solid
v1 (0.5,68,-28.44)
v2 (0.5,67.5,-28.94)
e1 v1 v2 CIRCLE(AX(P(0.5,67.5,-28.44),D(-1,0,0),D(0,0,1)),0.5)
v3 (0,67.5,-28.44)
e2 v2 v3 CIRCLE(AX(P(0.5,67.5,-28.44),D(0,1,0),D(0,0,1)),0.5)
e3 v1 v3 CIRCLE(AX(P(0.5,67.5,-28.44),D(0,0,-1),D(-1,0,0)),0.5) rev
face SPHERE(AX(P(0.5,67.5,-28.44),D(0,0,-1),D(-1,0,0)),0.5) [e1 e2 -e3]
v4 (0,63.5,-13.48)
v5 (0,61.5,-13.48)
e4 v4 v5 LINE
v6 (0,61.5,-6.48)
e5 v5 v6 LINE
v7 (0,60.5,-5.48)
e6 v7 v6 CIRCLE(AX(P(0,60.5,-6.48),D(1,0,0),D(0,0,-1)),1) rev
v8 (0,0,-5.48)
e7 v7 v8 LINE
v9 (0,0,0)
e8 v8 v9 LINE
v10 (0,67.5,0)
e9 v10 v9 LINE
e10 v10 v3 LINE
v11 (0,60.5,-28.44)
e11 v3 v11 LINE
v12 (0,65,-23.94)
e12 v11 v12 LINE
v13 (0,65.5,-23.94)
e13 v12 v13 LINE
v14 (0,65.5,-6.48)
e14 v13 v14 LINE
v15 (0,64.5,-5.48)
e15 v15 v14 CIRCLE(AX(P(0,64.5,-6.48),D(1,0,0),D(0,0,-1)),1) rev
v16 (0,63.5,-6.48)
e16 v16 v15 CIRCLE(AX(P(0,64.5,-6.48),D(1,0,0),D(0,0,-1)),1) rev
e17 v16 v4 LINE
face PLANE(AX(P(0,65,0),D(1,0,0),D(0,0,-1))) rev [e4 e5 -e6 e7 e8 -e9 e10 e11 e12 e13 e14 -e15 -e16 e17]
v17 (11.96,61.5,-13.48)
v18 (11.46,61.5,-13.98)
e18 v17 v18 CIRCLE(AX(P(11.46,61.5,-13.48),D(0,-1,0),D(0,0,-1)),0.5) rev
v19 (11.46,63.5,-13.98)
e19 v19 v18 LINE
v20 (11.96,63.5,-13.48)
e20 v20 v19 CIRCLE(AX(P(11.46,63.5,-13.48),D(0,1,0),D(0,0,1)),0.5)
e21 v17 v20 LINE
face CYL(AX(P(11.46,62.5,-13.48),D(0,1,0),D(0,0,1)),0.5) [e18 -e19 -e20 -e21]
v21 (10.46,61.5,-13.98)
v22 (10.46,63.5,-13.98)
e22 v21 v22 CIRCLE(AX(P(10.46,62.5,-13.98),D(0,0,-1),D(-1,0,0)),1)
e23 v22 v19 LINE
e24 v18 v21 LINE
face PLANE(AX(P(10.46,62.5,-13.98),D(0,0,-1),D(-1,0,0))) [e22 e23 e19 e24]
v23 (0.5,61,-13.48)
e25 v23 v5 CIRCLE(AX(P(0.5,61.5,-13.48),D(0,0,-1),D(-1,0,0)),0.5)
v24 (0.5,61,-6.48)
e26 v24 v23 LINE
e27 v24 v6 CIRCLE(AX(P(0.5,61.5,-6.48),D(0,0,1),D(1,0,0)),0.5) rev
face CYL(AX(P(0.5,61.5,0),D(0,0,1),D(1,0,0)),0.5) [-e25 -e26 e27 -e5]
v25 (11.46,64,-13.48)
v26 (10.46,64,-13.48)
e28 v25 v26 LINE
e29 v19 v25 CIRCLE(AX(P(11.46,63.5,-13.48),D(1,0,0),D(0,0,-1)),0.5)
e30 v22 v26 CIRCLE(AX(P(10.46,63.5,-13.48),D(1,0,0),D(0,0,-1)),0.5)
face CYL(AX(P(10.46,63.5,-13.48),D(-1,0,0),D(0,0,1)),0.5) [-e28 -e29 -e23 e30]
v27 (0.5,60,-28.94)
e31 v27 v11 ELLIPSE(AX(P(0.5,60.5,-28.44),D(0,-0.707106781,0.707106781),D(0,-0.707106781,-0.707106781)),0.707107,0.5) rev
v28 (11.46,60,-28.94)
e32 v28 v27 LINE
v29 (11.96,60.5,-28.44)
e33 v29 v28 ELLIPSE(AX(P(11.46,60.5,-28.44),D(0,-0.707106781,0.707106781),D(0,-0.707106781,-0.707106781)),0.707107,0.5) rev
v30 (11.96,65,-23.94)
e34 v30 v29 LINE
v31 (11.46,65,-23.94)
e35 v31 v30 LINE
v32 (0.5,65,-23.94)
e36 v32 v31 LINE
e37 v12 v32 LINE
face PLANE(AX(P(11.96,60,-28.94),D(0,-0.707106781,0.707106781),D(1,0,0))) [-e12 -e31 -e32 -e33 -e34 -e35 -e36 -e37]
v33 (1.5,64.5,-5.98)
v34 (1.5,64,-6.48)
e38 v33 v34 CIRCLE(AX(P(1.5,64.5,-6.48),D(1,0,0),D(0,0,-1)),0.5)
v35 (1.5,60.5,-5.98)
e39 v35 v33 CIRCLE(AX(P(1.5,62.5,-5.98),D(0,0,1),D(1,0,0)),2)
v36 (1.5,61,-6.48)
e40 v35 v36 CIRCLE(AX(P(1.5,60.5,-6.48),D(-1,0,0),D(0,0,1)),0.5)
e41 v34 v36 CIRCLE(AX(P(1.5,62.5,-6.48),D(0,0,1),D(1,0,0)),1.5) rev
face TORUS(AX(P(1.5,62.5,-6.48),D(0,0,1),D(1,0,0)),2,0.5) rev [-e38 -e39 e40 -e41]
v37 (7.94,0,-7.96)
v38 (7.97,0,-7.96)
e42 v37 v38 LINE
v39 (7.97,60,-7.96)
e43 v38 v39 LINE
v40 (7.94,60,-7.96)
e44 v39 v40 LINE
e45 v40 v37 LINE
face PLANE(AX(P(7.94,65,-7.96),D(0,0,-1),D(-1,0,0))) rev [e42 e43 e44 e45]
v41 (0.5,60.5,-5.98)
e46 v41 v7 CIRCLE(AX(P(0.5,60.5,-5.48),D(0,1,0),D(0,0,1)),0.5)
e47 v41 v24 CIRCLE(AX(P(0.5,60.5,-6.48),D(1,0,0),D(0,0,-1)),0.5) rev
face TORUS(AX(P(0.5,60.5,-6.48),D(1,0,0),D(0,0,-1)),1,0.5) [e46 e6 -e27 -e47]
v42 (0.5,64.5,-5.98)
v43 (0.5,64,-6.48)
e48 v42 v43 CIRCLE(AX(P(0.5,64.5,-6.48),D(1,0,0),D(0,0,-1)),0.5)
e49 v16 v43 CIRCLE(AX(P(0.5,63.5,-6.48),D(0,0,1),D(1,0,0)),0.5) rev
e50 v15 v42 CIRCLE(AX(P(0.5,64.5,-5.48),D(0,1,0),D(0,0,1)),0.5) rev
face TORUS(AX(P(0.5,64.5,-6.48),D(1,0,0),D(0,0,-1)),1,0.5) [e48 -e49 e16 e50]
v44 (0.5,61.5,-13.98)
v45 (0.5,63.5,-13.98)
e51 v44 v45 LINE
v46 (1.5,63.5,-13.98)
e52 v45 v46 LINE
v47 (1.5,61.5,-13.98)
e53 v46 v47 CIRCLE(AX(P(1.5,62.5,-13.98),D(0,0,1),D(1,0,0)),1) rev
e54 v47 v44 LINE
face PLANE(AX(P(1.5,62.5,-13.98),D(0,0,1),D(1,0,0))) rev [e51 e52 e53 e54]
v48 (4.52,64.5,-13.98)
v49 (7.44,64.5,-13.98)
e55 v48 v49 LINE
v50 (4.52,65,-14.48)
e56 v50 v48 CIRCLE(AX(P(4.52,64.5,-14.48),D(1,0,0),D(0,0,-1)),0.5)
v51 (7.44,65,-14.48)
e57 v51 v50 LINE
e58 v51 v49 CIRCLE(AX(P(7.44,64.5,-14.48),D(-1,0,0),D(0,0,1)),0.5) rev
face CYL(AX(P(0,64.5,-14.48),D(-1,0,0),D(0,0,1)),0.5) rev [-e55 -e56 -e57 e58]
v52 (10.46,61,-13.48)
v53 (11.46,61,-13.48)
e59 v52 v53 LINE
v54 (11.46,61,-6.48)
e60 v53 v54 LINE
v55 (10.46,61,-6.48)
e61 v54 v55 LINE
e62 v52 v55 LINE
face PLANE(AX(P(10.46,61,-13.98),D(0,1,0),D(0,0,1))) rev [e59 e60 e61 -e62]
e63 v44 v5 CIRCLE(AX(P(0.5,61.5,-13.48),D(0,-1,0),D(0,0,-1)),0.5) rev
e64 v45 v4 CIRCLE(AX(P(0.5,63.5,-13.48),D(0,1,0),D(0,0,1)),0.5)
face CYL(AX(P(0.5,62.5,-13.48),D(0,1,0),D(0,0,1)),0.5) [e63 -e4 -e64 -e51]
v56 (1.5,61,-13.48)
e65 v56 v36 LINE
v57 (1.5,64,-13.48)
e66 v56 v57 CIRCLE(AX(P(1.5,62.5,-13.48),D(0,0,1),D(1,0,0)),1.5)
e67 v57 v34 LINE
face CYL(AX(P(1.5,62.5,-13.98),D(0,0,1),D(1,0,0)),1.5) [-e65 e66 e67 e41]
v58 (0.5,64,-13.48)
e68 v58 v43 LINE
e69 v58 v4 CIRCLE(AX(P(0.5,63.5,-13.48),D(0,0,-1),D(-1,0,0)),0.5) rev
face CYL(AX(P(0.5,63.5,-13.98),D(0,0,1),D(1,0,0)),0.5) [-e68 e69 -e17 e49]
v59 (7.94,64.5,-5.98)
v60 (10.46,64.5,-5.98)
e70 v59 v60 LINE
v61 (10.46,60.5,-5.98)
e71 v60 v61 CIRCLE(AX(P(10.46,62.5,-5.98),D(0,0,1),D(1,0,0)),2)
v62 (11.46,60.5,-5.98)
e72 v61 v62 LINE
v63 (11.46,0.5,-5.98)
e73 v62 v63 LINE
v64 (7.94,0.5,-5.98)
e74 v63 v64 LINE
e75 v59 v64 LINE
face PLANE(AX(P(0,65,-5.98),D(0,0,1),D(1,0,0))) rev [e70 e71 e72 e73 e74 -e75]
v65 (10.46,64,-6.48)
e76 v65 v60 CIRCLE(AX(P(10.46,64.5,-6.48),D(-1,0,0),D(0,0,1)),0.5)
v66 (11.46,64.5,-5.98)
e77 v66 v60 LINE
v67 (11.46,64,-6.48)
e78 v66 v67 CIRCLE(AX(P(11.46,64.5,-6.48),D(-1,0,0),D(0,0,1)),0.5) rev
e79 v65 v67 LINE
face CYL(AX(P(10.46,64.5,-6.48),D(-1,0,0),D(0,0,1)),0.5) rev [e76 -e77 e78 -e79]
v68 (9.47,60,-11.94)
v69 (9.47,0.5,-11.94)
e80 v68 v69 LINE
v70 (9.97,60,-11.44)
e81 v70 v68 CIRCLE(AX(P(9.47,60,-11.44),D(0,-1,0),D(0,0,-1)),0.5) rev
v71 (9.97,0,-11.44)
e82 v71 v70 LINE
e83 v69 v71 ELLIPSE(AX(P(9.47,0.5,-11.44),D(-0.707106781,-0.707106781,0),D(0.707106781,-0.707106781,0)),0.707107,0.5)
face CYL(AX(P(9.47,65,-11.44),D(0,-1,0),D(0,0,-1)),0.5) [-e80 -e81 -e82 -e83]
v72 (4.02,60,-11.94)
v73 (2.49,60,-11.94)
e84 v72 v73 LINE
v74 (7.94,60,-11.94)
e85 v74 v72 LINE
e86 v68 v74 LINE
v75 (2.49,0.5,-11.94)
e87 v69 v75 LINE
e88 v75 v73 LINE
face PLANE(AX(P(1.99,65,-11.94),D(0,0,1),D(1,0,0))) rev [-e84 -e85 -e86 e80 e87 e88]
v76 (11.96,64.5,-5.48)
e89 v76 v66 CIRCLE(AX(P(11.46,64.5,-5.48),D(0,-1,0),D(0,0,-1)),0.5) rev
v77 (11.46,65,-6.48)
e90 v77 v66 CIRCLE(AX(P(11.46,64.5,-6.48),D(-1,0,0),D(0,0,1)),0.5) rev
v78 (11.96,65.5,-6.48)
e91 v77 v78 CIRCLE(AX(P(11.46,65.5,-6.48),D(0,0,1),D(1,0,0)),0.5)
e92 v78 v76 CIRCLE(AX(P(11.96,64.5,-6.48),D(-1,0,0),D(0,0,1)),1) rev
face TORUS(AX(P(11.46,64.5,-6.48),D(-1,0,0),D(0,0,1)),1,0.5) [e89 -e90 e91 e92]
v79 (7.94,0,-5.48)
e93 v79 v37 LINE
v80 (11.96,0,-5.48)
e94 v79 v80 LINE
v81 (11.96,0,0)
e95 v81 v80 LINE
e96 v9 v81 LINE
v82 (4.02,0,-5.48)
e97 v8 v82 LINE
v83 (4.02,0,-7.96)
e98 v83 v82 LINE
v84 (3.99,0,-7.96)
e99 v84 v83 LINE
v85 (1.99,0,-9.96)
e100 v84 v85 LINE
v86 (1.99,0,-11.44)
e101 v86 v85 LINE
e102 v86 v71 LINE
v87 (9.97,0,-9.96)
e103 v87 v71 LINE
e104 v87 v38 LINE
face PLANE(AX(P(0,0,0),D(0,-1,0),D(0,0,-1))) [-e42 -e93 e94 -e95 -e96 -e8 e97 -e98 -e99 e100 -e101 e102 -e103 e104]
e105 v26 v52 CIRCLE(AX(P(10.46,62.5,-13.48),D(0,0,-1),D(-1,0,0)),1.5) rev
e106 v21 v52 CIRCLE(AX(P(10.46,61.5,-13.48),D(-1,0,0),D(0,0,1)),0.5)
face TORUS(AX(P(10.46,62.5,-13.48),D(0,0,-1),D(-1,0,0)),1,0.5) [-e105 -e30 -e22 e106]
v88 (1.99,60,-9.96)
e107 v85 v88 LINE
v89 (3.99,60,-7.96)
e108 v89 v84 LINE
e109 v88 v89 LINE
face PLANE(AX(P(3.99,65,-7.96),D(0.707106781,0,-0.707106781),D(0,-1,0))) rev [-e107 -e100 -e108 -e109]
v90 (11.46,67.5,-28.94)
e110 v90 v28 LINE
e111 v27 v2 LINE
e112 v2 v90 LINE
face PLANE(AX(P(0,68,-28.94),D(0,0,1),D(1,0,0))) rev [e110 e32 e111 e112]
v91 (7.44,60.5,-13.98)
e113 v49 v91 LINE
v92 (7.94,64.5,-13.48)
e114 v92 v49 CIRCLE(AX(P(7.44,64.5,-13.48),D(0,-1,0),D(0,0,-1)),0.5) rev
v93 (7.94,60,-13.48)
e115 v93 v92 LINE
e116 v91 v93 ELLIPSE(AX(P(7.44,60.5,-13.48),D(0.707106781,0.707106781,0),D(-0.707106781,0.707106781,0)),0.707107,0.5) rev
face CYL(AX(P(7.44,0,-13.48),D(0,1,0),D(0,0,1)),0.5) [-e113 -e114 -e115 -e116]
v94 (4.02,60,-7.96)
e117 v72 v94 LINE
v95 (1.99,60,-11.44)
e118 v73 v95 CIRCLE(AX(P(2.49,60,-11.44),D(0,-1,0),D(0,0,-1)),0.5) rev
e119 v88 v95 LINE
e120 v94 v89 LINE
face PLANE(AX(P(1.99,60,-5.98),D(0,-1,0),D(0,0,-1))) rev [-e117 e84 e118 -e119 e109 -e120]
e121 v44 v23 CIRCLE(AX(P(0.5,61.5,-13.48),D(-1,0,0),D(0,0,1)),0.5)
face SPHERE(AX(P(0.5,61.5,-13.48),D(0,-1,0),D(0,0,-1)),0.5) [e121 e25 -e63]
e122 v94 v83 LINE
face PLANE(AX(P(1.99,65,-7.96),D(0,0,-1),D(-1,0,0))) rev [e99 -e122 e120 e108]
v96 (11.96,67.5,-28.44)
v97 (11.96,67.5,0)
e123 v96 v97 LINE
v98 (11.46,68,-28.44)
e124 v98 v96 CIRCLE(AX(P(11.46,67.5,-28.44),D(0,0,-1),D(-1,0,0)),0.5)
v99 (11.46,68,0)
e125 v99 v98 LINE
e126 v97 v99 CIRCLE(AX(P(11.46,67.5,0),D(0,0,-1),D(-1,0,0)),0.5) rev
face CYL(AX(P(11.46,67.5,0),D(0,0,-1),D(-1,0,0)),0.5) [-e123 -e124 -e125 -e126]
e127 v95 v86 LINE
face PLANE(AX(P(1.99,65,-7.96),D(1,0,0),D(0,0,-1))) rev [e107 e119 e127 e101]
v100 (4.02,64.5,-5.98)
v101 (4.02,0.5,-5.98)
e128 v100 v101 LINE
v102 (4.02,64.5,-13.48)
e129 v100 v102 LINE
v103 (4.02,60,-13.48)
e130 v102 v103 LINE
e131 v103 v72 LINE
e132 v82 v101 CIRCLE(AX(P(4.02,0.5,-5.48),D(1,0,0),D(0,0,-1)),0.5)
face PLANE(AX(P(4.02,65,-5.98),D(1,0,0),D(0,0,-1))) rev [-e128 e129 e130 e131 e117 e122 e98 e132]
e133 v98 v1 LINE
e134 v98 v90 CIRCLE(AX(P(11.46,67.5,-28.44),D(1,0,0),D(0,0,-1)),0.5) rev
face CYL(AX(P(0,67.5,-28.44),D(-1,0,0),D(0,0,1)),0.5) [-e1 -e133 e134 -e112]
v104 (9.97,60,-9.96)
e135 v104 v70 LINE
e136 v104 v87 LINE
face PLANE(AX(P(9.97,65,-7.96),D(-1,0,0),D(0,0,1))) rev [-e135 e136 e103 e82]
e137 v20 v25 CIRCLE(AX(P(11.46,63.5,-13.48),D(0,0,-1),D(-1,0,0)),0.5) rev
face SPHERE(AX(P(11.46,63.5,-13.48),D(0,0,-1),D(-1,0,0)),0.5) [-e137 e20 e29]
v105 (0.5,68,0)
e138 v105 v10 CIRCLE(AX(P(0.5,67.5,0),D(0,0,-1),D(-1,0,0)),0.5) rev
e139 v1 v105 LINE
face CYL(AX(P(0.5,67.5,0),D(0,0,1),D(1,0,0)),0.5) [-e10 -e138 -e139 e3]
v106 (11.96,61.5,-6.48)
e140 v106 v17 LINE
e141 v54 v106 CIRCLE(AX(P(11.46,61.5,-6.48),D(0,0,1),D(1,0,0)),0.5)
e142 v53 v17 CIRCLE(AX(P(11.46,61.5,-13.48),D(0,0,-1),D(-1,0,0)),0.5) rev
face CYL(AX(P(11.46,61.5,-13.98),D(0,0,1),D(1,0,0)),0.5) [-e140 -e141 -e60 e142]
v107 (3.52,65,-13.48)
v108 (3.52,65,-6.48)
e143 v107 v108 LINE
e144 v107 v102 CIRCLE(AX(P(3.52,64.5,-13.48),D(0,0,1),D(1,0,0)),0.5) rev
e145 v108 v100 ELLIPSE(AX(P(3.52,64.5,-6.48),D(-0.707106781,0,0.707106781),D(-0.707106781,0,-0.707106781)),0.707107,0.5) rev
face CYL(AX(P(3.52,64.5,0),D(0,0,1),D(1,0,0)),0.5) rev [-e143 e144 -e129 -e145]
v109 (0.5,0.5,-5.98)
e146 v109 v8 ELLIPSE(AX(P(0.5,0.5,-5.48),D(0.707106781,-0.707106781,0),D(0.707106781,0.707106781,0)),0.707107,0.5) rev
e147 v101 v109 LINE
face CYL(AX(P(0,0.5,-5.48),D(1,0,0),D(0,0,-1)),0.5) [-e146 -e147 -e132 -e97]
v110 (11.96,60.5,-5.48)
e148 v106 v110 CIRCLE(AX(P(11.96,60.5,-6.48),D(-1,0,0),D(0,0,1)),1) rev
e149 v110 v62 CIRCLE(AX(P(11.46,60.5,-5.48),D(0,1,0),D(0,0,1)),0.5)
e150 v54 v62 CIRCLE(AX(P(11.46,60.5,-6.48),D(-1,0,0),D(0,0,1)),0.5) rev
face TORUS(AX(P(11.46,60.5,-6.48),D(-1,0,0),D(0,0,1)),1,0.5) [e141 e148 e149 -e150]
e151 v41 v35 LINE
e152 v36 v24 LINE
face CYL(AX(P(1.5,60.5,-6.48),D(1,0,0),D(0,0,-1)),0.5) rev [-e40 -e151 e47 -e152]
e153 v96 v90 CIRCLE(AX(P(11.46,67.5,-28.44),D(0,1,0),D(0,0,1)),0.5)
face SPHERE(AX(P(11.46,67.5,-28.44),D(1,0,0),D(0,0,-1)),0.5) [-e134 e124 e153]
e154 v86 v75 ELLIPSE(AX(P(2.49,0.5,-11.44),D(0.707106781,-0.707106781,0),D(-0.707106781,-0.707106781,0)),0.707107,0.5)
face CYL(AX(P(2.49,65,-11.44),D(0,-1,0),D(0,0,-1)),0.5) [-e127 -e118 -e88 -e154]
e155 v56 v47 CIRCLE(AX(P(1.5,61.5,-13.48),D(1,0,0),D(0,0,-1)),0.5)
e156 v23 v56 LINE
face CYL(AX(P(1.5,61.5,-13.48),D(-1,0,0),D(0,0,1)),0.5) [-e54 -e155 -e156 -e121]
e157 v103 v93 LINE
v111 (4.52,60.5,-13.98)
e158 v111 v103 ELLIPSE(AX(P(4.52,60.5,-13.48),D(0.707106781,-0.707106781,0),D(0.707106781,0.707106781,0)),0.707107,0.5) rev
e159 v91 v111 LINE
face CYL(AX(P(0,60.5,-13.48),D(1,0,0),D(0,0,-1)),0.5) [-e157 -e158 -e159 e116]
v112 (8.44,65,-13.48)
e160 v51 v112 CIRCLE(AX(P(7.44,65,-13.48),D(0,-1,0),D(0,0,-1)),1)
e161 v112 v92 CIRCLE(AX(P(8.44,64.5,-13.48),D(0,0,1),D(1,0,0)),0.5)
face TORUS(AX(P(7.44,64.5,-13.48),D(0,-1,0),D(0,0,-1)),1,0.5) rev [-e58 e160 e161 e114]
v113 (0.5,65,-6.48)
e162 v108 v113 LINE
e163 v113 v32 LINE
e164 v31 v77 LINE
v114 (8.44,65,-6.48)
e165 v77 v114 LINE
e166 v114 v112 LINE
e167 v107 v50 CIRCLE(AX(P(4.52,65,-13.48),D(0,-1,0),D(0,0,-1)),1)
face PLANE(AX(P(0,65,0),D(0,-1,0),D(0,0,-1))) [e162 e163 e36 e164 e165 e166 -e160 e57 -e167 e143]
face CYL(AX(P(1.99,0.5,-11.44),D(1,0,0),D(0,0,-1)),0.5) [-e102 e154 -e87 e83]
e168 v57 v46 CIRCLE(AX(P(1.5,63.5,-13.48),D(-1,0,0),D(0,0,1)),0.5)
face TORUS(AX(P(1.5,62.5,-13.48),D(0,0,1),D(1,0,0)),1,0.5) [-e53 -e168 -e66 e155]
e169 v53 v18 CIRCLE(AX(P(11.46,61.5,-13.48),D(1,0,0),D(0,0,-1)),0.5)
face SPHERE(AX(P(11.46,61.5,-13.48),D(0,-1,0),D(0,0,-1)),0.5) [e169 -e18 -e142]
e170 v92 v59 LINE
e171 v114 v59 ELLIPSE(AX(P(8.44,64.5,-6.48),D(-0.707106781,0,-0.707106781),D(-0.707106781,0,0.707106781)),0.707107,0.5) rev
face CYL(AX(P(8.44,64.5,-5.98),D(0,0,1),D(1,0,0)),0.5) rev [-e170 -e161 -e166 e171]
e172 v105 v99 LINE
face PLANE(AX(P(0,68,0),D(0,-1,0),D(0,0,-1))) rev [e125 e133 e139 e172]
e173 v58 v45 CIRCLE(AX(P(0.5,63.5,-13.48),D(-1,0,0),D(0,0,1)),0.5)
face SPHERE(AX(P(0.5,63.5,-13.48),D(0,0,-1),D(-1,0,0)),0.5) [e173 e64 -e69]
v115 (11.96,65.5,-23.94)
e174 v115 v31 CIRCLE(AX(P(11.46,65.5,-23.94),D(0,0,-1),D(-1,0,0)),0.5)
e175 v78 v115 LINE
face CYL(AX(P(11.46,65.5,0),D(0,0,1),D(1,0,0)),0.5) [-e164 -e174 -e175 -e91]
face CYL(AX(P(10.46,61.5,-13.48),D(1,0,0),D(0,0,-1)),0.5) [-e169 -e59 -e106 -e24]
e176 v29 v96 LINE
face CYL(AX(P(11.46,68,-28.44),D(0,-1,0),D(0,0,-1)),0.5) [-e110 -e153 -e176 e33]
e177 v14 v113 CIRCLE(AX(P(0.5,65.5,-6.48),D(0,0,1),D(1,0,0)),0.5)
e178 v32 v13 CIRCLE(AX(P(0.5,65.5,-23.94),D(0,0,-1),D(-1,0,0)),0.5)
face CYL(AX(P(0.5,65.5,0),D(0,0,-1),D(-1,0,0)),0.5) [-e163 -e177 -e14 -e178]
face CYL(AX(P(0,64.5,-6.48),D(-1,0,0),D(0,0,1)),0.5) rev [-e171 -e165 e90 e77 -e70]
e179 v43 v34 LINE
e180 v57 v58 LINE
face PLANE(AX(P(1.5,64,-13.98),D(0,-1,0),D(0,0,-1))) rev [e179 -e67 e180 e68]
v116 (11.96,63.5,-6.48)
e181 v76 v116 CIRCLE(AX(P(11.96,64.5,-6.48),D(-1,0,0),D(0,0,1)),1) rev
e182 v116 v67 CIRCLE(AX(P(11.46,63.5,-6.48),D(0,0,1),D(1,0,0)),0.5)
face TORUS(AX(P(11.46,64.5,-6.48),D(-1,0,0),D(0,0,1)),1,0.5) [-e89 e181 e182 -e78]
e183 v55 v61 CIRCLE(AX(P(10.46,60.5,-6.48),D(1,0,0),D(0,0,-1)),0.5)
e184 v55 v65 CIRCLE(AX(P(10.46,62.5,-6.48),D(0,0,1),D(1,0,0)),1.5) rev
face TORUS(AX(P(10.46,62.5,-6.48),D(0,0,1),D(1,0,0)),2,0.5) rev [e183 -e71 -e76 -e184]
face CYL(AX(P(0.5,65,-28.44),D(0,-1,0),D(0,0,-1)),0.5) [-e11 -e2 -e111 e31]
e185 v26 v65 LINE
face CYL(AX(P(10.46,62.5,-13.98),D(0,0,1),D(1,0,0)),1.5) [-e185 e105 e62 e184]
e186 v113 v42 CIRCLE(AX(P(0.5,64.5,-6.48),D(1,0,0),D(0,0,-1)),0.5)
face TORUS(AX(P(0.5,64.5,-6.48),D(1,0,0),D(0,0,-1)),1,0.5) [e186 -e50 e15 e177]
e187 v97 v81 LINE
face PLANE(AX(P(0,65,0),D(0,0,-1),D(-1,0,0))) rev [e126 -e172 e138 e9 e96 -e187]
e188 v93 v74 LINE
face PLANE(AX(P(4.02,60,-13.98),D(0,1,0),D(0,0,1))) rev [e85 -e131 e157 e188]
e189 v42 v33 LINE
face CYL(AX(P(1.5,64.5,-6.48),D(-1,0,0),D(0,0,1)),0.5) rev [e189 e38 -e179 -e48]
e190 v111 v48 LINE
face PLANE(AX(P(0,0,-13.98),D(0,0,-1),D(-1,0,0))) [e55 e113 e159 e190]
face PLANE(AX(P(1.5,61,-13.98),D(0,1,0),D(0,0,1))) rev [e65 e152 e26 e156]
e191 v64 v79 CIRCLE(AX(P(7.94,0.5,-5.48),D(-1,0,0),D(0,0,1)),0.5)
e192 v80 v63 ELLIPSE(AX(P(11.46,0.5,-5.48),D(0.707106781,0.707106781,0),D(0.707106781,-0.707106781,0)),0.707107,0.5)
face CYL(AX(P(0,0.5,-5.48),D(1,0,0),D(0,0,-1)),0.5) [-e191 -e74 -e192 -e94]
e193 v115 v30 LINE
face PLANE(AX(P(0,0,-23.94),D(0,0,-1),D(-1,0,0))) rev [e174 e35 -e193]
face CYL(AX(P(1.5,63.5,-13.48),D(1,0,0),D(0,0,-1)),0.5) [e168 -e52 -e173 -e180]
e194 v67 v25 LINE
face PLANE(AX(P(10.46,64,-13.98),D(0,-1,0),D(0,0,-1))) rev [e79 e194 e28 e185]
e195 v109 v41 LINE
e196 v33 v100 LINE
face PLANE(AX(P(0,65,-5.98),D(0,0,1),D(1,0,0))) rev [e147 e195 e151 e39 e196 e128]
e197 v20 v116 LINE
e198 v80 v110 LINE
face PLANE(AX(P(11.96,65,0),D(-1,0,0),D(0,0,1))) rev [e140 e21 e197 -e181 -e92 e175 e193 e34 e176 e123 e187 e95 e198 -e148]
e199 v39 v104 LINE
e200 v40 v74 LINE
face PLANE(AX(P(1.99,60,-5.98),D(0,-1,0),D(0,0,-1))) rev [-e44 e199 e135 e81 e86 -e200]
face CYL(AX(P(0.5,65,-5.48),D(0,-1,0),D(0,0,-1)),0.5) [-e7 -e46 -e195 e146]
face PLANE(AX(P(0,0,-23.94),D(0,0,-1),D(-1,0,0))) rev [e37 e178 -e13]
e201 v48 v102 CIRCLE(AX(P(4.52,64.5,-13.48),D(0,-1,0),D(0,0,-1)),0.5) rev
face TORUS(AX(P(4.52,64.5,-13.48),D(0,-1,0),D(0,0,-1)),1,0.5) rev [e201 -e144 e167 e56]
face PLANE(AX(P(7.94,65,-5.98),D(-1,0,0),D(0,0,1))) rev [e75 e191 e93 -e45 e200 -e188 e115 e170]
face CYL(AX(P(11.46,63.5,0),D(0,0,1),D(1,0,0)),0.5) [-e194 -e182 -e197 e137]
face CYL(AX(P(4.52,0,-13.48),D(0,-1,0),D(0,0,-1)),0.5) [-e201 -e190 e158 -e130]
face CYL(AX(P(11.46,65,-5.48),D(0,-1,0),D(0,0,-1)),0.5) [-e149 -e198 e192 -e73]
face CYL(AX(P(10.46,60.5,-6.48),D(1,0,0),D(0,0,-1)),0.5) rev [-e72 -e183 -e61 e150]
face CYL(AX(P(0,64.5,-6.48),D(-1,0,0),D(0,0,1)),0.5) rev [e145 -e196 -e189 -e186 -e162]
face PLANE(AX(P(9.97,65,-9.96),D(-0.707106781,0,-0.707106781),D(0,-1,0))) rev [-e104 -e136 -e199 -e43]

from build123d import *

# Parameters (mm, degrees)
BOSS_EXTRU_1_DEPTH      = 65
ESQUISSE2_W             = 11.96
ESQUISSE2_H             = 28.94
BOSS_EXTRU_2_DEPTH      = 3
ESQUISSE3_W             = 11.96
ESQUISSE3_H             = 8
BOSS_EXTRU_3_DEPTH      = 5
CHANFREIN4_SIZE         = 2
ESQUISSE8_W             = 7.98
ESQUISSE8_H             = 5
ENL_V_MAT_EXTRU_1_DEPTH = 5.96
ESQUISSE9_W             = 3.92
ESQUISSE9_H             = 5
BOSS_EXTRU_5_DEPTH      = 8
BOSS_EXTRU_4_DEPTH      = 8
CONG_2_R                = 0.5
CHANFREIN5_SIZE         = 5


with BuildPart() as part:
    # Esquisse1 → Boss.-Extru.1 (new body)
    with BuildSketch(Plane(origin=(0, 0, 0), x_dir=(1, 0, 0), z_dir=(0, 1, 0))):
        Polygon((7.94, 7.96), (9.97, 7.96), (9.97, 11.94), (1.99, 11.94), (1.99, 7.96), (4.02, 7.96), (4.02, 5.98), (0, 5.98), (0, 0), (11.96, 0), (11.96, 5.98), (7.94, 5.98), align=None)
    extrude(amount=BOSS_EXTRU_1_DEPTH)

    # Esquisse2 → Boss.-Extru.2 (add)
    with BuildSketch(Plane(origin=(0, 65, 0), x_dir=(1, 0, 0), z_dir=(0, 1, 0))):
        with Locations((5.98, 14.47)):
            Rectangle(ESQUISSE2_W, ESQUISSE2_H)
    extrude(amount=BOSS_EXTRU_2_DEPTH)

    # Esquisse3 → Boss.-Extru.3 (add)
    with BuildSketch(Plane(origin=(0, 0, -28.94), x_dir=(-1, 0, 0), z_dir=(0, 0, -1))):
        with Locations((-5.98, 64)):
            Rectangle(ESQUISSE3_W, ESQUISSE3_H)
    extrude(amount=-BOSS_EXTRU_3_DEPTH)

    # Chanfrein4
    chanfrein4_edges = [part.edges().sort_by_distance(p)[0] for p in [
        (1.99, 32.5, -7.96),
        (9.97, 32.5, -7.96),
    ]]
    chamfer(chanfrein4_edges, length=CHANFREIN4_SIZE)

    # Esquisse8 → Enlèv. mat.-Extru.1 (cut)
    with BuildSketch(Plane(origin=(0, 0, -11.94), x_dir=(-1, 0, 0), z_dir=(0, 0, -1))):
        with Locations((-5.98, 62.5)):
            Rectangle(ESQUISSE8_W, ESQUISSE8_H)
    extrude(amount=-ENL_V_MAT_EXTRU_1_DEPTH, mode=Mode.SUBTRACT)

    # Esquisse9 → Boss.-Extru.5 (add)
    with BuildSketch(Plane(origin=(0, 0, -5.98), x_dir=(-1, 0, 0), z_dir=(0, 0, -1))):
        with Locations((-5.98, 62.5)):
            Rectangle(ESQUISSE9_W, ESQUISSE9_H)
    extrude(amount=BOSS_EXTRU_5_DEPTH)

    # Esquisse5 → Boss.-Extru.4 (add)
    with BuildSketch(Plane(origin=(0, 0, -5.98), x_dir=(-1, 0, 0), z_dir=(0, 0, -1))):
        with BuildLine():
            Line((-10.46, 64), (-11.96, 64))
            Line((-11.96, 64), (-11.96, 61))
            Line((-11.96, 61), (-10.46, 61))
            ThreePointArc((-10.46, 61), (-8.96, 62.5), (-10.46, 64))
        make_face()
        with BuildLine():
            Line((-1.5, 61), (0, 61))
            Line((0, 61), (0, 64))
            Line((0, 64), (-1.5, 64))
            ThreePointArc((-1.5, 64), (-3, 62.5), (-1.5, 61))
        make_face()
    extrude(amount=BOSS_EXTRU_4_DEPTH)

    # Congé2
    cong_2_edges = [part.edges().sort_by_distance(p)[0] for p in [
        (2.01, 0, -5.98),
        (2.01, 65, -5.98),
        (4.02, 65, -9.98),
        (7.94, 65, -9.98),
        (4.02, 62.5, -13.98),
        (5.98, 65, -13.98),
        (7.94, 62.5, -13.98),
        (5.98, 60, -13.98),
        (5.98, 0, -11.94),
        (0, 30.5, -5.98),
        (3, 62.5, -5.98),
        (0.75, 61, -5.98),
        (0, 61, -9.98),
        (0.75, 64, -5.98),
        (0, 64, -9.98),
        (3, 62.5, -13.98),
        (0.75, 61, -13.98),
        (0, 62.5, -13.98),
        (0.75, 64, -13.98),
        (11.96, 30.5, -5.98),
        (8.96, 62.5, -5.98),
        (11.21, 64, -5.98),
        (9.95, 0, -5.98),
        (11.96, 64, -9.98),
        (11.21, 61, -5.98),
        (11.96, 61, -9.98),
        (8.96, 62.5, -13.98),
        (11.21, 64, -13.98),
        (11.96, 62.5, -13.98),
        (11.21, 61, -13.98),
        (9.95, 65, -5.98),
        (0, 64.5, -5.98),
        (11.96, 64.5, -5.98),
        (0, 64, -28.94),
        (11.96, 65, -14.96),
        (11.96, 64, -28.94),
        (0, 68, -14.47),
        (11.96, 68, -14.47),
        (5.98, 68, -28.94),
        (0, 65, -14.96),
        (1.99, 30, -11.94),
        (9.97, 30, -11.94),
    ]]
    fillet(cong_2_edges, radius=CONG_2_R - 0.0001)  # a hair under: the kernel refuses the full size

    # Chanfrein5
    chanfrein5_edges = [part.edges().sort_by_distance(p)[0] for p in [
        (5.98, 60, -23.94),
    ]]
    chamfer(chanfrein5_edges, length=CHANFREIN5_SIZE - 0.0001)  # a hair under: the kernel refuses the full size


solid = part.part
